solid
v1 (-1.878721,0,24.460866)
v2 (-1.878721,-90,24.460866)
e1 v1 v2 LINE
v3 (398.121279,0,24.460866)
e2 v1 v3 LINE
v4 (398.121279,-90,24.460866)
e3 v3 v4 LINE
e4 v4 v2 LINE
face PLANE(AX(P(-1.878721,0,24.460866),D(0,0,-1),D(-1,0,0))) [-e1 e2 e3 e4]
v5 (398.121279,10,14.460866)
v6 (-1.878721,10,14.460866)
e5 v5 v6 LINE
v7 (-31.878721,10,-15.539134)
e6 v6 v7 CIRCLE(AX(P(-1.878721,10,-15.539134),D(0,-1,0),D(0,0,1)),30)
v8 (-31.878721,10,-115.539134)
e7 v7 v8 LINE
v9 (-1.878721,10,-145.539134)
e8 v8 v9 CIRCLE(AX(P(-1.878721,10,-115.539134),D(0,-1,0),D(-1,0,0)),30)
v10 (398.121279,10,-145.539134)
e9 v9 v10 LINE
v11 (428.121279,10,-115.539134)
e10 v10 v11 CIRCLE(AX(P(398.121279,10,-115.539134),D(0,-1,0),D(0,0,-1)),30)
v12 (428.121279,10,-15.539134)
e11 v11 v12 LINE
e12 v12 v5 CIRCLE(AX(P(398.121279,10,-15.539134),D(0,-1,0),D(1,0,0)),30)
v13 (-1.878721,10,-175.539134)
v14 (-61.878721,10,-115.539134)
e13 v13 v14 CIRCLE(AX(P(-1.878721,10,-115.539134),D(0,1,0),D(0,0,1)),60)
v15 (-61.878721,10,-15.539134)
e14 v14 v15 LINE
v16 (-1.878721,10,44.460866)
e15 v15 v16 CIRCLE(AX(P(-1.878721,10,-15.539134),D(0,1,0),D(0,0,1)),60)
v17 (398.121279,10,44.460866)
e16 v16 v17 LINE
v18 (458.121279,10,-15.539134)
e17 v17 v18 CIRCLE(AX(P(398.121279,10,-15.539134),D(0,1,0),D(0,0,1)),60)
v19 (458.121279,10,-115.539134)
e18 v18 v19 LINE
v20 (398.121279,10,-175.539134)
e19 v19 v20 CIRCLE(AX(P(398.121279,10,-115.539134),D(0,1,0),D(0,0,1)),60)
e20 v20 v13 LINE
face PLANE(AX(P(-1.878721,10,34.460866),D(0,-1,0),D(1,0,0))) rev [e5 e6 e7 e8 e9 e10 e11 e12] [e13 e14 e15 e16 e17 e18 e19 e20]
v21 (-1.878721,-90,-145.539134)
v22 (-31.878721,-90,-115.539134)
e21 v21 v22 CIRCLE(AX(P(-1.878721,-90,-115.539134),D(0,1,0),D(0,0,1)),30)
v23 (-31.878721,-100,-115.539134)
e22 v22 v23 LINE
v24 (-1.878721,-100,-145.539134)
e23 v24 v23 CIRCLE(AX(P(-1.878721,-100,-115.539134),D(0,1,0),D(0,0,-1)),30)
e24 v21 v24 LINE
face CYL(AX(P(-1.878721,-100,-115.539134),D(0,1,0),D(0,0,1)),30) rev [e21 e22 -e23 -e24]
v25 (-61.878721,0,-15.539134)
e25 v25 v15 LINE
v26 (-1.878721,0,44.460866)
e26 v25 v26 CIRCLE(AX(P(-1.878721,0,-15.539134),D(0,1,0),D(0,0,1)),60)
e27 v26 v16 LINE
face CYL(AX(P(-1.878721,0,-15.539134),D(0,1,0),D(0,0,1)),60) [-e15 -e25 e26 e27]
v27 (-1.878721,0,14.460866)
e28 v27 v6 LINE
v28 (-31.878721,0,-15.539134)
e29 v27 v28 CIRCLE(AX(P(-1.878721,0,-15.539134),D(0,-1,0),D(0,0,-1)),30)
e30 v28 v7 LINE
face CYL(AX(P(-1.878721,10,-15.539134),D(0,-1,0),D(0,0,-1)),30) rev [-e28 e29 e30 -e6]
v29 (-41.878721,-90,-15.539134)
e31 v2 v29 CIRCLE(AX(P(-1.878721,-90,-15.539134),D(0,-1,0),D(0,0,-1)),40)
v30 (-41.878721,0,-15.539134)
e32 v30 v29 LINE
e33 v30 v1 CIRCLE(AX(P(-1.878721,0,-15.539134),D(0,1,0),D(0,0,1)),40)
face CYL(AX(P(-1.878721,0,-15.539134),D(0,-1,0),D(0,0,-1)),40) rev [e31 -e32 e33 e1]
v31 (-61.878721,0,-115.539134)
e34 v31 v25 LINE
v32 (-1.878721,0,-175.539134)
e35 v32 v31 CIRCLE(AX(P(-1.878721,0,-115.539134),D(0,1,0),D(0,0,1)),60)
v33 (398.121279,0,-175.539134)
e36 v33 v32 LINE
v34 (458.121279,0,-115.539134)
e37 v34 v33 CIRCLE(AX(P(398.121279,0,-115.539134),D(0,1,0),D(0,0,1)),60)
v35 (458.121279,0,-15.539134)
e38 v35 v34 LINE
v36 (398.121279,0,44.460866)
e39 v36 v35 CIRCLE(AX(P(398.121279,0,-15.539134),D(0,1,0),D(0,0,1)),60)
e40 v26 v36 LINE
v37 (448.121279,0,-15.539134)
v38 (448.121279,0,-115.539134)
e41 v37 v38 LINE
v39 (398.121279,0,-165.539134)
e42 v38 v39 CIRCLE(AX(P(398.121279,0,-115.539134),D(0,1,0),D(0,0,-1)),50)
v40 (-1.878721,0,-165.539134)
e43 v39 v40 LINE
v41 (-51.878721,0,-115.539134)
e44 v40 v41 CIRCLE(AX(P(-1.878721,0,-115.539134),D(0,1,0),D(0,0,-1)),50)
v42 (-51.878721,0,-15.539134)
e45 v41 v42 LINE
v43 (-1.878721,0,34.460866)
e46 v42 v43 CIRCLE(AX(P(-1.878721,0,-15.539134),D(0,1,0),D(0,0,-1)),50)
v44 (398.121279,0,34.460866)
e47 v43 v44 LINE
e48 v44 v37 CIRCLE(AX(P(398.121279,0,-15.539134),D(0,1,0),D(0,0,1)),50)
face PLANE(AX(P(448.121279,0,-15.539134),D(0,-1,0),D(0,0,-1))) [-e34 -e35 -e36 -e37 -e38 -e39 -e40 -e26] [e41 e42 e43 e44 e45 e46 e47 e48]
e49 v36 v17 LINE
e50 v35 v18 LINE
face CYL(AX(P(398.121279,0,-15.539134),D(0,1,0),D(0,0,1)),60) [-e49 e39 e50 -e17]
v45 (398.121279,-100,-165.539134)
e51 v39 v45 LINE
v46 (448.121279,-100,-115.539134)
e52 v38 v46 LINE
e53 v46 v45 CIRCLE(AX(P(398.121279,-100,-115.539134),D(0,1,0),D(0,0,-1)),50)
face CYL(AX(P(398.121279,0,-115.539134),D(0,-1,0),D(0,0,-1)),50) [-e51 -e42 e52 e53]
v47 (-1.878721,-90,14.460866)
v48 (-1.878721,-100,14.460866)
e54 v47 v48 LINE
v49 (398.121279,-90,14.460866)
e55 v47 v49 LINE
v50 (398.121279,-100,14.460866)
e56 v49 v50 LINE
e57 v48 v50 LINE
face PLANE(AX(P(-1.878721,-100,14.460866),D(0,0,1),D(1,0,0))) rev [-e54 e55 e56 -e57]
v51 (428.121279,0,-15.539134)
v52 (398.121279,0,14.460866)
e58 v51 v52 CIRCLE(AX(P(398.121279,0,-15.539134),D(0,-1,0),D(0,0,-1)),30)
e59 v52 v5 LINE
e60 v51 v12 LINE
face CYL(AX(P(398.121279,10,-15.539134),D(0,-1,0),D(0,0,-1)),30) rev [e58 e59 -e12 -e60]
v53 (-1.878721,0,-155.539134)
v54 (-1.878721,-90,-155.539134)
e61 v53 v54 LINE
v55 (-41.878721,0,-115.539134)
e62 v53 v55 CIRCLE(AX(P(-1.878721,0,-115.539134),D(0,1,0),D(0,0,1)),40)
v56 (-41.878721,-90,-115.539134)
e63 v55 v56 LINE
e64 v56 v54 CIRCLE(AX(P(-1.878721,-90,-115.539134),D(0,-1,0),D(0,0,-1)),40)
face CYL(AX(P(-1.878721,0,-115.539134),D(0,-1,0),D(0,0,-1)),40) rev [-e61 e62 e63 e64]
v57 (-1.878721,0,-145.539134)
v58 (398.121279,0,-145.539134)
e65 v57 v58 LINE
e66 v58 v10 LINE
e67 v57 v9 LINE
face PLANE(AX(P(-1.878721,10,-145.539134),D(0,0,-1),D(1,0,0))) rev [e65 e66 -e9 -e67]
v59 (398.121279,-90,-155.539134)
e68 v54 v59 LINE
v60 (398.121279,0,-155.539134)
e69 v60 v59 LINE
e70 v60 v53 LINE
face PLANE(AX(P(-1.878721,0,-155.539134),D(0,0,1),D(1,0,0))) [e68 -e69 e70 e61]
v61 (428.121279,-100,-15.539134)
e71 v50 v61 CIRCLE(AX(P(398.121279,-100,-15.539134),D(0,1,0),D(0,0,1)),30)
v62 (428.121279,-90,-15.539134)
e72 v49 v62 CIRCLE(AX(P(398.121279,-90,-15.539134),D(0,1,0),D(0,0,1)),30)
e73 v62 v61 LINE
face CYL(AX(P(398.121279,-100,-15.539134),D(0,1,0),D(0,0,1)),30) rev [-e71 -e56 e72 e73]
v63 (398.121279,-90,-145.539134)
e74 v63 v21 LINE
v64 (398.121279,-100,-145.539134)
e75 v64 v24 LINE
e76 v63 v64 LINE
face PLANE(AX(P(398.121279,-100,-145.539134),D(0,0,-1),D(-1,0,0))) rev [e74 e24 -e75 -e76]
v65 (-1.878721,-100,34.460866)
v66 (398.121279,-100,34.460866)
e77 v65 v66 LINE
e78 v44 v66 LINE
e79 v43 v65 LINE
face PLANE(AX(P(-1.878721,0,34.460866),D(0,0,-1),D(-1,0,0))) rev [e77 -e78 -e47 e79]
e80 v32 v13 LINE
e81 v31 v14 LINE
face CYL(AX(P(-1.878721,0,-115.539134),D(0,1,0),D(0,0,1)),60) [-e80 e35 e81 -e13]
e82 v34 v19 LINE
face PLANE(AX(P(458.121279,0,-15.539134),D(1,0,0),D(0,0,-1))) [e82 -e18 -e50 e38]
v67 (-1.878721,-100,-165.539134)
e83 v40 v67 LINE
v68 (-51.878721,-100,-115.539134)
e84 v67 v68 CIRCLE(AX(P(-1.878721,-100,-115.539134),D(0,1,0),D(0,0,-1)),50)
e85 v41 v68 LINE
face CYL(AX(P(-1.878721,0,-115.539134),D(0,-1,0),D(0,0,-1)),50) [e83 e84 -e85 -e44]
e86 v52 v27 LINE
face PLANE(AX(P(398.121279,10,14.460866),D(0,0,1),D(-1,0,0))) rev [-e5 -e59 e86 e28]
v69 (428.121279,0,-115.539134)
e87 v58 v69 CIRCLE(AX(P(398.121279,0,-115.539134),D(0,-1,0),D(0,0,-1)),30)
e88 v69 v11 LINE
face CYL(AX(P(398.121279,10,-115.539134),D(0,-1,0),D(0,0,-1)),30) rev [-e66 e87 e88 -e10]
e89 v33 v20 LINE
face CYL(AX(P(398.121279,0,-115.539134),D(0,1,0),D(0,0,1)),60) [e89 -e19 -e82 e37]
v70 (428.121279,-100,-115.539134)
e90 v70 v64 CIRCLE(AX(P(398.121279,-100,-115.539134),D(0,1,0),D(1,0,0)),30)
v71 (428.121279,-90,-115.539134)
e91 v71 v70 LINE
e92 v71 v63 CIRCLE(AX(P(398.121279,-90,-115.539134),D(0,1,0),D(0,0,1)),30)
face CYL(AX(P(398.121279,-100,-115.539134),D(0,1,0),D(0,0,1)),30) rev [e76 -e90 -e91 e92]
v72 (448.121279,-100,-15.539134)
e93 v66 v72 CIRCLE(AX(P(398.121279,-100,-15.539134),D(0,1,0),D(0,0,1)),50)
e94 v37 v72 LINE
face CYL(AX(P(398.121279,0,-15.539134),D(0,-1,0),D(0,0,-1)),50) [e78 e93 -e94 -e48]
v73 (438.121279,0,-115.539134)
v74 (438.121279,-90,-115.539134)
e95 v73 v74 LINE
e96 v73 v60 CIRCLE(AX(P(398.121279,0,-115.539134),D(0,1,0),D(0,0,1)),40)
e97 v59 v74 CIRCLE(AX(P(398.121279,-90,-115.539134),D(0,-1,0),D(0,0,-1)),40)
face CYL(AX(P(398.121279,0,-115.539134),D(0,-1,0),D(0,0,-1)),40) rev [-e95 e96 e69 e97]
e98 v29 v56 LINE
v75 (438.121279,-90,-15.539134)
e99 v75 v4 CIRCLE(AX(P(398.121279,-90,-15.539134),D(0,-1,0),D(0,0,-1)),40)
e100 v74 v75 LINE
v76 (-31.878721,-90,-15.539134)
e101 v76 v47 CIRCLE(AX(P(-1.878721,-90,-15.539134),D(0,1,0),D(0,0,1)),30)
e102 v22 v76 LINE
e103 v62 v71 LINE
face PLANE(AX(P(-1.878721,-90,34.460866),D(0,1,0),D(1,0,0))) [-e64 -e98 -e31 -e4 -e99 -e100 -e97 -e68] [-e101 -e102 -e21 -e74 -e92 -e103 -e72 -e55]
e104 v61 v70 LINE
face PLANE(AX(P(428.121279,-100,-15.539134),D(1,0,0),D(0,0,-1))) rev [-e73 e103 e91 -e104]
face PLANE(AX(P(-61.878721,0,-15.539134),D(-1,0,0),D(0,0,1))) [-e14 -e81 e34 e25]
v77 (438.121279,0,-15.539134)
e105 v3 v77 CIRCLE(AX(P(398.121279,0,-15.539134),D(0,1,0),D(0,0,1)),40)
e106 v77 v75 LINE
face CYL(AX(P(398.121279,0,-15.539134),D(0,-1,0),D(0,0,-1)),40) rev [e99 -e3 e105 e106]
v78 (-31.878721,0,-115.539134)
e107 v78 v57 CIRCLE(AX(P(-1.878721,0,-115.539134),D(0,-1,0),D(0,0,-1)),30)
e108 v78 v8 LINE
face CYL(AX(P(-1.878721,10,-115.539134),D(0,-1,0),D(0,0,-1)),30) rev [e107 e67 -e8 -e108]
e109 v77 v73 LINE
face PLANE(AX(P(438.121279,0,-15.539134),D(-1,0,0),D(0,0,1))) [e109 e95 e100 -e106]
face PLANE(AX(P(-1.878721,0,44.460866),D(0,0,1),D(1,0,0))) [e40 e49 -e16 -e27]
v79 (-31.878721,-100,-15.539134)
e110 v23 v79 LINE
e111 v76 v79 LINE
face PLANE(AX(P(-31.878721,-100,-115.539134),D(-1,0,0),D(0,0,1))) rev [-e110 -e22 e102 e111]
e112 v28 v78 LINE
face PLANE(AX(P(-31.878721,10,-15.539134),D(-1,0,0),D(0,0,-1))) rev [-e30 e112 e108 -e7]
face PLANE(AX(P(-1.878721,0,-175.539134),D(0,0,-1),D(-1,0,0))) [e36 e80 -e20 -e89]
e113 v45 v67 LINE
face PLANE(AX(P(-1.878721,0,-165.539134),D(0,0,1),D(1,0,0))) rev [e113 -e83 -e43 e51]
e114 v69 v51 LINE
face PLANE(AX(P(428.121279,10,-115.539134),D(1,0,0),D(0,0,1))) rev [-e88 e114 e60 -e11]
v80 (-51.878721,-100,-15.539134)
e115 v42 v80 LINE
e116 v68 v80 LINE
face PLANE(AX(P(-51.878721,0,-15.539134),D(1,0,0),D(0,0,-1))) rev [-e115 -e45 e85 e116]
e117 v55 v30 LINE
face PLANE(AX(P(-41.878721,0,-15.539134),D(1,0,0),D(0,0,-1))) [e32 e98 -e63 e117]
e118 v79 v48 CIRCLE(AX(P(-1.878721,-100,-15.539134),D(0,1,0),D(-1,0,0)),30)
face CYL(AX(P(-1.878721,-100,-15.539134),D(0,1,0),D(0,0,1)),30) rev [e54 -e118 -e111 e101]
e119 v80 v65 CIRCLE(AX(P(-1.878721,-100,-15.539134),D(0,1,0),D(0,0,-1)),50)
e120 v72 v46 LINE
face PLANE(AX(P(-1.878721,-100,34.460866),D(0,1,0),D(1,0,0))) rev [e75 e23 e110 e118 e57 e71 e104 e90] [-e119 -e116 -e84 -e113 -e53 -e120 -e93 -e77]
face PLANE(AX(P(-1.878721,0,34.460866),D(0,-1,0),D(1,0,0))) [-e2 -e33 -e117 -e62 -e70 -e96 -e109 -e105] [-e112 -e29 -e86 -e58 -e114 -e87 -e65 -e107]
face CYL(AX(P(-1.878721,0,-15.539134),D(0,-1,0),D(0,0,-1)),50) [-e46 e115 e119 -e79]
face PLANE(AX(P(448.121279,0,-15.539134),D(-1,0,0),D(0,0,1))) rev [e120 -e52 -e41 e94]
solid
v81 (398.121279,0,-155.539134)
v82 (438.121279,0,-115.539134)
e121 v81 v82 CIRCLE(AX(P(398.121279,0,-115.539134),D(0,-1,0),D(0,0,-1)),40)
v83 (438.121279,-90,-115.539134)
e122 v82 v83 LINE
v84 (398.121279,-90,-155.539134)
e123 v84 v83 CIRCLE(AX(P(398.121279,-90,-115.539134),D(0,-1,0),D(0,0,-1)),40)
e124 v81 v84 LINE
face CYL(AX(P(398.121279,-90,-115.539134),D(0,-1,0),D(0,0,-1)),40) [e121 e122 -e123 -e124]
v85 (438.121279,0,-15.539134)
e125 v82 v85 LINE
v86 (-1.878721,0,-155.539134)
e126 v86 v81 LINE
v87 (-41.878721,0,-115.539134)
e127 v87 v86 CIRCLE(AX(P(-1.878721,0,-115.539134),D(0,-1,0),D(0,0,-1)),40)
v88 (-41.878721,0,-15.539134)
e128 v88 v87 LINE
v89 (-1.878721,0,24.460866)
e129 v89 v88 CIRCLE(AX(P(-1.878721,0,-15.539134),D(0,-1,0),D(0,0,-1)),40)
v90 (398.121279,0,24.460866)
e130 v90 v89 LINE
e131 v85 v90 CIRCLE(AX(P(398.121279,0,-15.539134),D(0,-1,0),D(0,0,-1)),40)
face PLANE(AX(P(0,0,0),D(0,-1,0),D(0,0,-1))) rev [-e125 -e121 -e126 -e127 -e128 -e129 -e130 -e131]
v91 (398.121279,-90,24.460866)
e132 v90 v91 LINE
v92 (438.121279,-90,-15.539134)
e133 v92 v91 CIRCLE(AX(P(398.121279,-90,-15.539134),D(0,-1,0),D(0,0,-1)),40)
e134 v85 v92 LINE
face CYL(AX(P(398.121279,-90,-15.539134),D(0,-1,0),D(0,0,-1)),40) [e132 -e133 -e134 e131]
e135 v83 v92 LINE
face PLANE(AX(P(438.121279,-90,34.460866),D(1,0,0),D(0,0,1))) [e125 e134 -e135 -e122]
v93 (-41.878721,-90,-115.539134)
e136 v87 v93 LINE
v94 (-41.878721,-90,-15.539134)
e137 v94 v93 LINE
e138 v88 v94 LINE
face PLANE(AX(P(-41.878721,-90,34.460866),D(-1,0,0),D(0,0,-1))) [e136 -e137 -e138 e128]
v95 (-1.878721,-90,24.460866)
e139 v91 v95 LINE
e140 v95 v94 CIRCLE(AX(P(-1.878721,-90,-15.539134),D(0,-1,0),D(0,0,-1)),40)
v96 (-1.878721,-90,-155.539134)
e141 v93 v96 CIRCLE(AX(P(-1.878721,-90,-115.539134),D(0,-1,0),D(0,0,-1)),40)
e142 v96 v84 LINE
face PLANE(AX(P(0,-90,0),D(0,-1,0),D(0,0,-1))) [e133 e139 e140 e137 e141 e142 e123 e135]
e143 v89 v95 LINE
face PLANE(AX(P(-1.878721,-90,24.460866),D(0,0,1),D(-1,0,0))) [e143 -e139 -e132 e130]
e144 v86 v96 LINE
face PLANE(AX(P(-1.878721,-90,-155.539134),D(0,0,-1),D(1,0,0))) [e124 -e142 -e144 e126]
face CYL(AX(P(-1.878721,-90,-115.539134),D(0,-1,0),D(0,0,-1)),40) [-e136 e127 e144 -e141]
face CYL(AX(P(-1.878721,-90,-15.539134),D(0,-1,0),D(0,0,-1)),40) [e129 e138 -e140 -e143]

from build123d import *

# Parameters (mm, degrees)
SURFACE_EXTRUDE1_1_BACK  = 100
SURFACE_EXTRUDE1_1_DEPTH = 100
THICKEN1_T1              = 10
SURFACE_EXTRUDE2_2_DEPTH = 10
THICKEN2_T1              = 10
THICKEN2_T2              = 10
THICKEN3_START           = -100
THICKEN3_DEPTH           = 10
THICKEN4_DEPTH           = 10
THICKEN5_START           = -90
THICKEN5_DEPTH           = 90


# Read off the part's stored shape, not the designer's step: Thicken3, Thicken4, Thicken5
with BuildPart() as body_1:
    # Surface-Extrude1: a surface, the sketch's curves swept straight by 100 mm
    with BuildLine(Plane(origin=(0, 0, 0), x_dir=(1, 0, 0), z_dir=(0, 1, 0)).offset(-SURFACE_EXTRUDE1_1_BACK), mode=Mode.PRIVATE) as surface_extrude1_1_path:
        Line((-1.878720563, -34.460865773), (398.121279437, -34.460865773))
        ThreePointArc((398.121279437, -34.460865773), (433.476618497, -19.816204833), (448.121279437, 15.539134227))
        Line((448.121279437, 15.539134227), (448.121279437, 115.539134227))
        ThreePointArc((448.121279437, 115.539134227), (433.476618497, 150.894473286), (398.121279437, 165.539134227))
        Line((398.121279437, 165.539134227), (-1.878720563, 165.539134227))
        ThreePointArc((-1.878720563, 165.539134227), (-37.234059622, 150.894473286), (-51.878720563, 115.539134227))
        Line((-51.878720563, 115.539134227), (-51.878720563, 15.539134227))
        ThreePointArc((-51.878720563, 15.539134227), (-37.234059622, -19.816204833), (-1.878720563, -34.460865773))
    surface_extrude1_1 = Shell.extrude(surface_extrude1_1_path.wire(), (0 * SURFACE_EXTRUDE1_1_DEPTH, 1 * SURFACE_EXTRUDE1_1_DEPTH, 0 * SURFACE_EXTRUDE1_1_DEPTH))
    add(Solid.thicken(surface_extrude1_1, THICKEN1_T1))

    # Surface-Extrude2: a surface, the sketch's curves swept straight by 10 mm
    with BuildLine(Plane(origin=(0, 0, 0), x_dir=(1, 0, 0), z_dir=(0, 1, 0)), mode=Mode.PRIVATE) as surface_extrude2_2_path:
        Line((-1.878720563, -34.460865773), (398.121279437, -34.460865773))
        ThreePointArc((398.121279437, -34.460865773), (433.476618497, -19.816204833), (448.121279437, 15.539134227))
        Line((448.121279437, 15.539134227), (448.121279437, 115.539134227))
        ThreePointArc((448.121279437, 115.539134227), (433.476618497, 150.894473286), (398.121279437, 165.539134227))
        Line((398.121279437, 165.539134227), (-1.878720563, 165.539134227))
        ThreePointArc((-1.878720563, 165.539134227), (-37.234059622, 150.894473286), (-51.878720563, 115.539134227))
        Line((-51.878720563, 115.539134227), (-51.878720563, 15.539134227))
        ThreePointArc((-51.878720563, 15.539134227), (-37.234059622, -19.816204833), (-1.878720563, -34.460865773))
    surface_extrude2_2 = Shell.extrude(surface_extrude2_2_path.wire(), (0 * SURFACE_EXTRUDE2_2_DEPTH, 1 * SURFACE_EXTRUDE2_2_DEPTH, 0 * SURFACE_EXTRUDE2_2_DEPTH))
    add(Solid.thicken(surface_extrude2_2, THICKEN2_T1))
    add(Solid.thicken(surface_extrude2_2, -THICKEN2_T2))

    # Thicken3 outline → Thicken3 (add)
    with BuildSketch(Plane(origin=(0, 0, 0), x_dir=(1, 0, 0), z_dir=(0, 1, 0)).offset(THICKEN3_START)):
        with BuildLine():
            ThreePointArc((398.121279437, -24.460865773), (426.405550685, -12.745137021), (438.121279437, 15.539134227))
            Line((438.121279437, 15.539134227), (438.121279437, 115.539134227))
            ThreePointArc((438.121279437, 115.539134227), (426.405550684, 143.823405474), (398.121279437, 155.539134227))
            Line((398.121279437, 155.539134227), (-1.878720563, 155.539134227))
            ThreePointArc((-1.878720563, 155.539134227), (-30.16299181, 143.823405474), (-41.878720563, 115.539134227))
            Line((-41.878720563, 115.539134227), (-41.878720563, 15.539134227))
            ThreePointArc((-41.878720563, 15.539134227), (-30.16299181, -12.745137021), (-1.878720563, -24.460865773))
            Line((-1.878720563, -24.460865773), (398.121279437, -24.460865773))
        make_face()
        with BuildLine():
            ThreePointArc((398.121279437, 145.539134227), (419.334482873, 136.752337662), (428.121279437, 115.539134227))
            Line((428.121279437, 115.539134227), (428.121279437, 15.539134227))
            ThreePointArc((428.121279437, 15.539134227), (419.334482873, -5.674069209), (398.121279437, -14.460865773))
            Line((398.121279437, -14.460865773), (-1.878720563, -14.460865773))
            ThreePointArc((-1.878720563, -14.460865773), (-23.091923998, -5.674069208), (-31.878720563, 15.539134227))
            Line((-31.878720563, 15.539134227), (-31.878720563, 115.539134227))
            ThreePointArc((-31.878720563, 115.539134227), (-23.091923998, 136.752337662), (-1.878720563, 145.539134227))
            Line((-1.878720563, 145.539134227), (398.121279437, 145.539134227))
        make_face(mode=Mode.SUBTRACT)
    extrude(amount=THICKEN3_DEPTH)

    # Thicken4 outline → Thicken4 (add)
    with BuildSketch(Plane(origin=(0, 0, 0), x_dir=(1, 0, 0), z_dir=(0, 1, 0))):
        with BuildLine():
            ThreePointArc((398.121279437, -24.460865773), (426.405550685, -12.745137021), (438.121279437, 15.539134227))
            Line((438.121279437, 15.539134227), (438.121279437, 115.539134227))
            ThreePointArc((438.121279437, 115.539134227), (426.405550684, 143.823405474), (398.121279437, 155.539134227))
            Line((398.121279437, 155.539134227), (-1.878720563, 155.539134227))
            ThreePointArc((-1.878720563, 155.539134227), (-30.16299181, 143.823405474), (-41.878720563, 115.539134227))
            Line((-41.878720563, 115.539134227), (-41.878720563, 15.539134227))
            ThreePointArc((-41.878720563, 15.539134227), (-30.16299181, -12.745137021), (-1.878720563, -24.460865773))
            Line((-1.878720563, -24.460865773), (398.121279437, -24.460865773))
        make_face()
        with BuildLine():
            Line((-1.878720563, 145.539134227), (398.121279437, 145.539134227))
            ThreePointArc((398.121279437, 145.539134227), (419.334482873, 136.752337662), (428.121279437, 115.539134227))
            Line((428.121279437, 115.539134227), (428.121279437, 15.539134227))
            ThreePointArc((428.121279437, 15.539134227), (419.334482873, -5.674069209), (398.121279437, -14.460865773))
            Line((398.121279437, -14.460865773), (-1.878720563, -14.460865773))
            ThreePointArc((-1.878720563, -14.460865773), (-23.091923998, -5.674069208), (-31.878720563, 15.539134227))
            Line((-31.878720563, 15.539134227), (-31.878720563, 115.539134227))
            ThreePointArc((-31.878720563, 115.539134227), (-23.091923998, 136.752337662), (-1.878720563, 145.539134227))
        make_face(mode=Mode.SUBTRACT)
    extrude(amount=THICKEN4_DEPTH)


with BuildPart() as body_2:
    # Thicken5 outline → Thicken5 (new body)
    with BuildSketch(Plane(origin=(0, 0, 0), x_dir=(1, 0, 0), z_dir=(0, 1, 0)).offset(THICKEN5_START)):
        with BuildLine():
            ThreePointArc((-1.878720563, 155.539134227), (-30.16299181, 143.823405474), (-41.878720563, 115.539134227))
            Line((-41.878720563, 115.539134227), (-41.878720563, 15.539134227))
            ThreePointArc((-41.878720563, 15.539134227), (-30.16299181, -12.745137021), (-1.878720563, -24.460865773))
            Line((-1.878720563, -24.460865773), (398.121279437, -24.460865773))
            ThreePointArc((398.121279437, -24.460865773), (426.405550685, -12.745137021), (438.121279437, 15.539134227))
            Line((438.121279437, 15.539134227), (438.121279437, 115.539134227))
            ThreePointArc((438.121279437, 115.539134227), (426.405550684, 143.823405474), (398.121279437, 155.539134227))
            Line((398.121279437, 155.539134227), (-1.878720563, 155.539134227))
        make_face()
    extrude(amount=THICKEN5_DEPTH)


solid = Compound([body_1.part, body_2.part])
